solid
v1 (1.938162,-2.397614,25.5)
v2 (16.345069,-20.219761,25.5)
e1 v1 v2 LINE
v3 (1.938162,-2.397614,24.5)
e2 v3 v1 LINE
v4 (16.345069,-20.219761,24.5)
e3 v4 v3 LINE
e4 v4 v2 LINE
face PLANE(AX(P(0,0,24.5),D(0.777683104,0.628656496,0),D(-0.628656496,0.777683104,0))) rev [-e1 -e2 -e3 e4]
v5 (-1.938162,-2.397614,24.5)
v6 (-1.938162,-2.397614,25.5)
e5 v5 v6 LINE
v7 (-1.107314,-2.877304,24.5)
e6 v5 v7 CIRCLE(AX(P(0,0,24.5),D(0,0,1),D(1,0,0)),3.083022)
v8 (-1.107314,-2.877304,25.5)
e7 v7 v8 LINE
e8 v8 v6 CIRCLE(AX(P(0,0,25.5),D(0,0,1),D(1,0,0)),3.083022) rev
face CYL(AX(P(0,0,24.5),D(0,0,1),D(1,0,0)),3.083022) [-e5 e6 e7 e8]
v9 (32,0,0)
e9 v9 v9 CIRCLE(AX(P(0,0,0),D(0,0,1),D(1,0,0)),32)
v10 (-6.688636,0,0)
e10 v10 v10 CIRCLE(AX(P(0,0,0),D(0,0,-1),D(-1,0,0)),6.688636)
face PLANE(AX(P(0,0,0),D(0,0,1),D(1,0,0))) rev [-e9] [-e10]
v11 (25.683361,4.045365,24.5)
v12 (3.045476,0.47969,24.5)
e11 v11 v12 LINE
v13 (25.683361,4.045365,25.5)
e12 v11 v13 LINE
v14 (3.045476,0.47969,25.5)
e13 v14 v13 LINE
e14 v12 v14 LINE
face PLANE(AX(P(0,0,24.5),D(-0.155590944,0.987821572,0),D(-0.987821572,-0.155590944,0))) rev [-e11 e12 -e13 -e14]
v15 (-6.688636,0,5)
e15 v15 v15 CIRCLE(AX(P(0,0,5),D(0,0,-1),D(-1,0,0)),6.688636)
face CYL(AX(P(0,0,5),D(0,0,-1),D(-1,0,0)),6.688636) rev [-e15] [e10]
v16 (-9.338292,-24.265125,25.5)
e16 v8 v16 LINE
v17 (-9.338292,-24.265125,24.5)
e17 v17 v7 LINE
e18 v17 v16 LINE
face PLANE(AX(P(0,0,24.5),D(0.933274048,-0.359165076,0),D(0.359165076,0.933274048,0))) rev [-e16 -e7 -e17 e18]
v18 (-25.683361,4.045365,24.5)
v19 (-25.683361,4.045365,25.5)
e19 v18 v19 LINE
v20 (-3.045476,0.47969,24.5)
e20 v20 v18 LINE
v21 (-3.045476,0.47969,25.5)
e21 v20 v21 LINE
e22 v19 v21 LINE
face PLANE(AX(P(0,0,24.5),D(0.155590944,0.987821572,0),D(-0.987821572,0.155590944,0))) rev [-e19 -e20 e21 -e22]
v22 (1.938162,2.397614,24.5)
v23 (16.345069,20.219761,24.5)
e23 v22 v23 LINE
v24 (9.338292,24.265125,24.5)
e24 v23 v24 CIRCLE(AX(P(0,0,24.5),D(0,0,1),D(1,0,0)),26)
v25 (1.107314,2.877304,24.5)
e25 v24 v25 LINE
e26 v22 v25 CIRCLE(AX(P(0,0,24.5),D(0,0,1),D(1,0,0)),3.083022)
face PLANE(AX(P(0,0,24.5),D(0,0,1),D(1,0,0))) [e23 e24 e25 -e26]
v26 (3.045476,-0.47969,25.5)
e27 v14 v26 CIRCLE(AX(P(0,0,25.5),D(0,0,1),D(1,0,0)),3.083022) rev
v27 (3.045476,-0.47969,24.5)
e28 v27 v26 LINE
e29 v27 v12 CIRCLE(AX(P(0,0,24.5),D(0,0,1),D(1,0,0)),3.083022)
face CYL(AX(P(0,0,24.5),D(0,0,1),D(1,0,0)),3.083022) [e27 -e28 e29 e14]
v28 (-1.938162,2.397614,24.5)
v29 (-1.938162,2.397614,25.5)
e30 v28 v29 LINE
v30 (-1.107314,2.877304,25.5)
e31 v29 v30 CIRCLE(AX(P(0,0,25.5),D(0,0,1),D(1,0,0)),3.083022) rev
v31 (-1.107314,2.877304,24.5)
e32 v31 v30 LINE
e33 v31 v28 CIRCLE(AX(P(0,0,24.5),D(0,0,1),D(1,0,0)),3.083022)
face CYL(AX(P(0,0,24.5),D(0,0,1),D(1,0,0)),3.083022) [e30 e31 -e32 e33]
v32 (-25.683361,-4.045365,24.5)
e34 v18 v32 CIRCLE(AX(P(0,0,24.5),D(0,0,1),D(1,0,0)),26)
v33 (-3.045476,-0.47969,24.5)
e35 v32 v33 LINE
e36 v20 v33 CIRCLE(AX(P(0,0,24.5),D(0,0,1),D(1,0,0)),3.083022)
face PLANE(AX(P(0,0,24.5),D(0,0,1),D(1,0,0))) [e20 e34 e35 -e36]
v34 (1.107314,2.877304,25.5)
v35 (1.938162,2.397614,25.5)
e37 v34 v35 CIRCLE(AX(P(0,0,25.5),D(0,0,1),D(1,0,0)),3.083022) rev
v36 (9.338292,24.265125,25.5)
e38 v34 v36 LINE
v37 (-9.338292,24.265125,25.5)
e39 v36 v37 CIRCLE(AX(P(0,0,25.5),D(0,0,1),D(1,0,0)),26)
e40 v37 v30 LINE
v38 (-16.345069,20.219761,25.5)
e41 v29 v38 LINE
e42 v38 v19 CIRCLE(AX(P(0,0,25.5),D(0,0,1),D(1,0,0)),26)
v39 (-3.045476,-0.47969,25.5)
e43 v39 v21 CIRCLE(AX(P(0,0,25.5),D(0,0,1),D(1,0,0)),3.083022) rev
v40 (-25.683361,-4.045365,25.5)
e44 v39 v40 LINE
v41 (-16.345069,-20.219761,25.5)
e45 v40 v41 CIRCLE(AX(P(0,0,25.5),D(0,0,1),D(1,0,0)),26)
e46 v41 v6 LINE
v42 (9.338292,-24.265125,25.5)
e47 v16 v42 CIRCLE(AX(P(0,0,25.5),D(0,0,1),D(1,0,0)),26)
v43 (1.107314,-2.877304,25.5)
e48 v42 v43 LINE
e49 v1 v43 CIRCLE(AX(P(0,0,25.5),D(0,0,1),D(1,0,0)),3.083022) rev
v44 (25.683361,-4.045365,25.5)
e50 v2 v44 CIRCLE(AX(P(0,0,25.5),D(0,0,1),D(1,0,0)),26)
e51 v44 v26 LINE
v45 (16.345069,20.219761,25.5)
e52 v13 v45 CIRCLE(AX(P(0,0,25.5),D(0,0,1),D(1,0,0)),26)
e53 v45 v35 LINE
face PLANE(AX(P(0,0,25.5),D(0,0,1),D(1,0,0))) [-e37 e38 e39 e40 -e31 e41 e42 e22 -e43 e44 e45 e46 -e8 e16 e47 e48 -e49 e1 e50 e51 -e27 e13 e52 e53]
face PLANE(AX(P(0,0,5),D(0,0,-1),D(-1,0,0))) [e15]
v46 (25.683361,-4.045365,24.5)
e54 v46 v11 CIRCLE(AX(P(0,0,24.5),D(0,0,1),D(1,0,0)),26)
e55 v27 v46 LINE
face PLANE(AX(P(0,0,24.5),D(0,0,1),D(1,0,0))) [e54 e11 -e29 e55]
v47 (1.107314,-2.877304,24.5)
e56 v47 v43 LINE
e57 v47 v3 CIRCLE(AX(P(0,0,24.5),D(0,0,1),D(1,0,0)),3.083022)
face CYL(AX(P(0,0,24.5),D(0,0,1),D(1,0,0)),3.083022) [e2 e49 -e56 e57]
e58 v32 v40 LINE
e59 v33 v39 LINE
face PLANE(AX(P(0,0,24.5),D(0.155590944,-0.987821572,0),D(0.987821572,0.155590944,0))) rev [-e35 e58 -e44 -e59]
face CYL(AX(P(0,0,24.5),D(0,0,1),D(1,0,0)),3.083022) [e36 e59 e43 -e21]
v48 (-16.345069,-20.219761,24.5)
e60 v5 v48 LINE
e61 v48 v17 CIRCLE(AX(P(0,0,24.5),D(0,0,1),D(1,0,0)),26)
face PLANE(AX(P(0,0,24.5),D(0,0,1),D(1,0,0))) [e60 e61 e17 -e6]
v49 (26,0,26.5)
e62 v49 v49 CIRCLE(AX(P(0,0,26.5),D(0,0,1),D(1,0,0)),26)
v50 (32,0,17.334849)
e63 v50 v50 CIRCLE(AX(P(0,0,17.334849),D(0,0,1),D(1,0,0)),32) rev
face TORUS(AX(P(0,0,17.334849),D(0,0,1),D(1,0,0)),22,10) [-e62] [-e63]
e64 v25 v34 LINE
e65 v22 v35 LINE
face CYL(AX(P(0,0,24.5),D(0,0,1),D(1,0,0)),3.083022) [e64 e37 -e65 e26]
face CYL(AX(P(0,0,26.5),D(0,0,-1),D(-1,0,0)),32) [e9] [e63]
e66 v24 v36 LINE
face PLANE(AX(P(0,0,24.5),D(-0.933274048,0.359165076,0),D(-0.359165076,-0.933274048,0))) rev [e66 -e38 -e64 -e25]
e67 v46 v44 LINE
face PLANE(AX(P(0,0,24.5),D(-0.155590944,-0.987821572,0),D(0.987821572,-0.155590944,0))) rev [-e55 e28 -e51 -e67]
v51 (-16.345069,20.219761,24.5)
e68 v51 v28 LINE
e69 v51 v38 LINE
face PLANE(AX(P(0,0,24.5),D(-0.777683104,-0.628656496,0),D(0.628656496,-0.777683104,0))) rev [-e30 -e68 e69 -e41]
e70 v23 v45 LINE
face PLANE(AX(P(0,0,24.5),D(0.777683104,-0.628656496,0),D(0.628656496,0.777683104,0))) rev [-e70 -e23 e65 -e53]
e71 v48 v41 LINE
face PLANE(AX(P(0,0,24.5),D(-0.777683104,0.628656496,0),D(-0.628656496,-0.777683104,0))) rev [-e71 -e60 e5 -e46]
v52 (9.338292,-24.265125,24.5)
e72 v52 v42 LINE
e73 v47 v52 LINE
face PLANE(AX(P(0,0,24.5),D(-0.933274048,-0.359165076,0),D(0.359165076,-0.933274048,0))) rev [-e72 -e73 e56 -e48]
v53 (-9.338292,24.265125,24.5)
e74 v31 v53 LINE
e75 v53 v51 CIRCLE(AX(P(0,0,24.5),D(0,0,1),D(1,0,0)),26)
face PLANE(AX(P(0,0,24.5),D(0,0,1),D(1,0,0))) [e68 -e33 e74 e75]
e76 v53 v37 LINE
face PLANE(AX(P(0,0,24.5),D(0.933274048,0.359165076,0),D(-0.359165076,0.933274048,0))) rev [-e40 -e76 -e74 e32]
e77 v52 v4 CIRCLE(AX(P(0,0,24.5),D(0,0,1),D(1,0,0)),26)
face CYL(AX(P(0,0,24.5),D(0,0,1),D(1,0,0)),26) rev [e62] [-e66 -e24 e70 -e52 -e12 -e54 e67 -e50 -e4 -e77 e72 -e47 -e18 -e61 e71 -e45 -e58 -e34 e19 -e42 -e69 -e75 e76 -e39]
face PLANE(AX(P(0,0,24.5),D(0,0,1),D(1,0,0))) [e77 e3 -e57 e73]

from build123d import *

# Parameters (mm, degrees)
SKETCH_1_R          = 32
EXTRUDE_1_DEPTH     = 26.5
CUT_EXTRUDE_4_DEPTH = 2
SKETCH_3_R          = 26
CUT_EXTRUDE_5_DEPTH = 1
FILLET_1_R          = 10
SKETCH_4_R          = 6.68863581
CUT_EXTRUDE_6_DEPTH = 5


with BuildPart() as part:
    # 草图1 → 凸台-拉伸1 (new body)
    with BuildSketch(Plane.XY):
        Circle(SKETCH_1_R)
    extrude(amount=EXTRUDE_1_DEPTH)

    # 草图2 → 切除-拉伸4 (cut)
    with BuildSketch(Plane.XY.offset(26.5)):
        with BuildLine():
            ThreePointArc((3.045475662, 0.479690306), (3.083022023, 0), (3.045475662, -0.479690306))
            Line((3.045475662, -0.479690306), (25.683360874, -4.045364533))
            ThreePointArc((25.683360874, -4.045364533), (26, 0), (25.683360874, 4.045364533))
            Line((25.683360874, 4.045364533), (3.045475662, 0.479690306))
        make_face()
        with BuildLine():
            Line((16.34506889, -20.219760705), (1.938161822, -2.397614137))
            ThreePointArc((1.938161822, -2.397614137), (1.541511012, -2.669975393), (1.10731384, -2.877304443))
            Line((1.10731384, -2.877304443), (9.338291984, -24.265125238))
            ThreePointArc((9.338291984, -24.265125238), (13, -22.516660498), (16.34506889, -20.219760705))
        make_face()
        with BuildLine():
            Line((-9.338291984, -24.265125238), (-1.10731384, -2.877304443))
            ThreePointArc((-1.10731384, -2.877304443), (-1.541511012, -2.669975393), (-1.938161822, -2.397614137))
            Line((-1.938161822, -2.397614137), (-16.34506889, -20.219760705))
            ThreePointArc((-16.34506889, -20.219760705), (-13, -22.516660498), (-9.338291984, -24.265125238))
        make_face()
        with BuildLine():
            Line((-25.683360874, -4.045364533), (-3.045475662, -0.479690306))
            ThreePointArc((-3.045475662, -0.479690306), (-3.083022023, 0), (-3.045475662, 0.479690306))
            Line((-3.045475662, 0.479690306), (-25.683360874, 4.045364533))
            ThreePointArc((-25.683360874, 4.045364533), (-26, 0), (-25.683360874, -4.045364533))
        make_face()
        with BuildLine():
            Line((-16.34506889, 20.219760705), (-1.938161822, 2.397614137))
            ThreePointArc((-1.938161822, 2.397614137), (-1.541511012, 2.669975393), (-1.10731384, 2.877304443))
            Line((-1.10731384, 2.877304443), (-9.338291984, 24.265125238))
            ThreePointArc((-9.338291984, 24.265125238), (-13, 22.516660498), (-16.34506889, 20.219760705))
        make_face()
        with BuildLine():
            Line((9.338291984, 24.265125238), (1.10731384, 2.877304443))
            ThreePointArc((1.10731384, 2.877304443), (1.541511012, 2.669975393), (1.938161822, 2.397614137))
            Line((1.938161822, 2.397614137), (16.34506889, 20.219760705))
            ThreePointArc((16.34506889, 20.219760705), (13, 22.516660498), (9.338291984, 24.265125238))
        make_face()
    extrude(amount=-CUT_EXTRUDE_4_DEPTH, mode=Mode.SUBTRACT)

    # 草图3 → 切除-拉伸5 (cut)
    with BuildSketch(Plane.XY.offset(26.5)):
        Circle(SKETCH_3_R)
    extrude(amount=-CUT_EXTRUDE_5_DEPTH, mode=Mode.SUBTRACT)

    # 圆角1
    # the kernel refuses this fillet: 10 mm, written as the material it takes off along each edge
    with BuildSketch(Plane(origin=(0, 0, 26.5), x_dir=(1, 0, 0), z_dir=(0, -1, 0))) as fillet_1_piece_1:
        with BuildLine():
            CenterArc((22, -9.16515139), FILLET_1_R, 0, 66.421821522)
            Line((26, 0), (26.08, 0.183303028))
            ThreePointArc((26.08, 0.183303028), (29, 0.2), (32, 0.2))
            Line((32, 0.2), (32.2, 0))
            Line((32.2, 0), (32.2, -9.16515139))
            Line((32.2, -9.16515139), (32, -9.16515139))
        make_face()
    revolve(axis=Axis((0, 0, 26.5), (0, 0, 1)), mode=Mode.SUBTRACT)

    # 草图4 → 切除-拉伸6 (cut)
    with BuildSketch(Plane(origin=(0, 0, 0), x_dir=(-1, 0, 0), z_dir=(0, 0, -1))):
        Circle(SKETCH_4_R)
    extrude(amount=-CUT_EXTRUDE_6_DEPTH, mode=Mode.SUBTRACT)


solid = part.part
